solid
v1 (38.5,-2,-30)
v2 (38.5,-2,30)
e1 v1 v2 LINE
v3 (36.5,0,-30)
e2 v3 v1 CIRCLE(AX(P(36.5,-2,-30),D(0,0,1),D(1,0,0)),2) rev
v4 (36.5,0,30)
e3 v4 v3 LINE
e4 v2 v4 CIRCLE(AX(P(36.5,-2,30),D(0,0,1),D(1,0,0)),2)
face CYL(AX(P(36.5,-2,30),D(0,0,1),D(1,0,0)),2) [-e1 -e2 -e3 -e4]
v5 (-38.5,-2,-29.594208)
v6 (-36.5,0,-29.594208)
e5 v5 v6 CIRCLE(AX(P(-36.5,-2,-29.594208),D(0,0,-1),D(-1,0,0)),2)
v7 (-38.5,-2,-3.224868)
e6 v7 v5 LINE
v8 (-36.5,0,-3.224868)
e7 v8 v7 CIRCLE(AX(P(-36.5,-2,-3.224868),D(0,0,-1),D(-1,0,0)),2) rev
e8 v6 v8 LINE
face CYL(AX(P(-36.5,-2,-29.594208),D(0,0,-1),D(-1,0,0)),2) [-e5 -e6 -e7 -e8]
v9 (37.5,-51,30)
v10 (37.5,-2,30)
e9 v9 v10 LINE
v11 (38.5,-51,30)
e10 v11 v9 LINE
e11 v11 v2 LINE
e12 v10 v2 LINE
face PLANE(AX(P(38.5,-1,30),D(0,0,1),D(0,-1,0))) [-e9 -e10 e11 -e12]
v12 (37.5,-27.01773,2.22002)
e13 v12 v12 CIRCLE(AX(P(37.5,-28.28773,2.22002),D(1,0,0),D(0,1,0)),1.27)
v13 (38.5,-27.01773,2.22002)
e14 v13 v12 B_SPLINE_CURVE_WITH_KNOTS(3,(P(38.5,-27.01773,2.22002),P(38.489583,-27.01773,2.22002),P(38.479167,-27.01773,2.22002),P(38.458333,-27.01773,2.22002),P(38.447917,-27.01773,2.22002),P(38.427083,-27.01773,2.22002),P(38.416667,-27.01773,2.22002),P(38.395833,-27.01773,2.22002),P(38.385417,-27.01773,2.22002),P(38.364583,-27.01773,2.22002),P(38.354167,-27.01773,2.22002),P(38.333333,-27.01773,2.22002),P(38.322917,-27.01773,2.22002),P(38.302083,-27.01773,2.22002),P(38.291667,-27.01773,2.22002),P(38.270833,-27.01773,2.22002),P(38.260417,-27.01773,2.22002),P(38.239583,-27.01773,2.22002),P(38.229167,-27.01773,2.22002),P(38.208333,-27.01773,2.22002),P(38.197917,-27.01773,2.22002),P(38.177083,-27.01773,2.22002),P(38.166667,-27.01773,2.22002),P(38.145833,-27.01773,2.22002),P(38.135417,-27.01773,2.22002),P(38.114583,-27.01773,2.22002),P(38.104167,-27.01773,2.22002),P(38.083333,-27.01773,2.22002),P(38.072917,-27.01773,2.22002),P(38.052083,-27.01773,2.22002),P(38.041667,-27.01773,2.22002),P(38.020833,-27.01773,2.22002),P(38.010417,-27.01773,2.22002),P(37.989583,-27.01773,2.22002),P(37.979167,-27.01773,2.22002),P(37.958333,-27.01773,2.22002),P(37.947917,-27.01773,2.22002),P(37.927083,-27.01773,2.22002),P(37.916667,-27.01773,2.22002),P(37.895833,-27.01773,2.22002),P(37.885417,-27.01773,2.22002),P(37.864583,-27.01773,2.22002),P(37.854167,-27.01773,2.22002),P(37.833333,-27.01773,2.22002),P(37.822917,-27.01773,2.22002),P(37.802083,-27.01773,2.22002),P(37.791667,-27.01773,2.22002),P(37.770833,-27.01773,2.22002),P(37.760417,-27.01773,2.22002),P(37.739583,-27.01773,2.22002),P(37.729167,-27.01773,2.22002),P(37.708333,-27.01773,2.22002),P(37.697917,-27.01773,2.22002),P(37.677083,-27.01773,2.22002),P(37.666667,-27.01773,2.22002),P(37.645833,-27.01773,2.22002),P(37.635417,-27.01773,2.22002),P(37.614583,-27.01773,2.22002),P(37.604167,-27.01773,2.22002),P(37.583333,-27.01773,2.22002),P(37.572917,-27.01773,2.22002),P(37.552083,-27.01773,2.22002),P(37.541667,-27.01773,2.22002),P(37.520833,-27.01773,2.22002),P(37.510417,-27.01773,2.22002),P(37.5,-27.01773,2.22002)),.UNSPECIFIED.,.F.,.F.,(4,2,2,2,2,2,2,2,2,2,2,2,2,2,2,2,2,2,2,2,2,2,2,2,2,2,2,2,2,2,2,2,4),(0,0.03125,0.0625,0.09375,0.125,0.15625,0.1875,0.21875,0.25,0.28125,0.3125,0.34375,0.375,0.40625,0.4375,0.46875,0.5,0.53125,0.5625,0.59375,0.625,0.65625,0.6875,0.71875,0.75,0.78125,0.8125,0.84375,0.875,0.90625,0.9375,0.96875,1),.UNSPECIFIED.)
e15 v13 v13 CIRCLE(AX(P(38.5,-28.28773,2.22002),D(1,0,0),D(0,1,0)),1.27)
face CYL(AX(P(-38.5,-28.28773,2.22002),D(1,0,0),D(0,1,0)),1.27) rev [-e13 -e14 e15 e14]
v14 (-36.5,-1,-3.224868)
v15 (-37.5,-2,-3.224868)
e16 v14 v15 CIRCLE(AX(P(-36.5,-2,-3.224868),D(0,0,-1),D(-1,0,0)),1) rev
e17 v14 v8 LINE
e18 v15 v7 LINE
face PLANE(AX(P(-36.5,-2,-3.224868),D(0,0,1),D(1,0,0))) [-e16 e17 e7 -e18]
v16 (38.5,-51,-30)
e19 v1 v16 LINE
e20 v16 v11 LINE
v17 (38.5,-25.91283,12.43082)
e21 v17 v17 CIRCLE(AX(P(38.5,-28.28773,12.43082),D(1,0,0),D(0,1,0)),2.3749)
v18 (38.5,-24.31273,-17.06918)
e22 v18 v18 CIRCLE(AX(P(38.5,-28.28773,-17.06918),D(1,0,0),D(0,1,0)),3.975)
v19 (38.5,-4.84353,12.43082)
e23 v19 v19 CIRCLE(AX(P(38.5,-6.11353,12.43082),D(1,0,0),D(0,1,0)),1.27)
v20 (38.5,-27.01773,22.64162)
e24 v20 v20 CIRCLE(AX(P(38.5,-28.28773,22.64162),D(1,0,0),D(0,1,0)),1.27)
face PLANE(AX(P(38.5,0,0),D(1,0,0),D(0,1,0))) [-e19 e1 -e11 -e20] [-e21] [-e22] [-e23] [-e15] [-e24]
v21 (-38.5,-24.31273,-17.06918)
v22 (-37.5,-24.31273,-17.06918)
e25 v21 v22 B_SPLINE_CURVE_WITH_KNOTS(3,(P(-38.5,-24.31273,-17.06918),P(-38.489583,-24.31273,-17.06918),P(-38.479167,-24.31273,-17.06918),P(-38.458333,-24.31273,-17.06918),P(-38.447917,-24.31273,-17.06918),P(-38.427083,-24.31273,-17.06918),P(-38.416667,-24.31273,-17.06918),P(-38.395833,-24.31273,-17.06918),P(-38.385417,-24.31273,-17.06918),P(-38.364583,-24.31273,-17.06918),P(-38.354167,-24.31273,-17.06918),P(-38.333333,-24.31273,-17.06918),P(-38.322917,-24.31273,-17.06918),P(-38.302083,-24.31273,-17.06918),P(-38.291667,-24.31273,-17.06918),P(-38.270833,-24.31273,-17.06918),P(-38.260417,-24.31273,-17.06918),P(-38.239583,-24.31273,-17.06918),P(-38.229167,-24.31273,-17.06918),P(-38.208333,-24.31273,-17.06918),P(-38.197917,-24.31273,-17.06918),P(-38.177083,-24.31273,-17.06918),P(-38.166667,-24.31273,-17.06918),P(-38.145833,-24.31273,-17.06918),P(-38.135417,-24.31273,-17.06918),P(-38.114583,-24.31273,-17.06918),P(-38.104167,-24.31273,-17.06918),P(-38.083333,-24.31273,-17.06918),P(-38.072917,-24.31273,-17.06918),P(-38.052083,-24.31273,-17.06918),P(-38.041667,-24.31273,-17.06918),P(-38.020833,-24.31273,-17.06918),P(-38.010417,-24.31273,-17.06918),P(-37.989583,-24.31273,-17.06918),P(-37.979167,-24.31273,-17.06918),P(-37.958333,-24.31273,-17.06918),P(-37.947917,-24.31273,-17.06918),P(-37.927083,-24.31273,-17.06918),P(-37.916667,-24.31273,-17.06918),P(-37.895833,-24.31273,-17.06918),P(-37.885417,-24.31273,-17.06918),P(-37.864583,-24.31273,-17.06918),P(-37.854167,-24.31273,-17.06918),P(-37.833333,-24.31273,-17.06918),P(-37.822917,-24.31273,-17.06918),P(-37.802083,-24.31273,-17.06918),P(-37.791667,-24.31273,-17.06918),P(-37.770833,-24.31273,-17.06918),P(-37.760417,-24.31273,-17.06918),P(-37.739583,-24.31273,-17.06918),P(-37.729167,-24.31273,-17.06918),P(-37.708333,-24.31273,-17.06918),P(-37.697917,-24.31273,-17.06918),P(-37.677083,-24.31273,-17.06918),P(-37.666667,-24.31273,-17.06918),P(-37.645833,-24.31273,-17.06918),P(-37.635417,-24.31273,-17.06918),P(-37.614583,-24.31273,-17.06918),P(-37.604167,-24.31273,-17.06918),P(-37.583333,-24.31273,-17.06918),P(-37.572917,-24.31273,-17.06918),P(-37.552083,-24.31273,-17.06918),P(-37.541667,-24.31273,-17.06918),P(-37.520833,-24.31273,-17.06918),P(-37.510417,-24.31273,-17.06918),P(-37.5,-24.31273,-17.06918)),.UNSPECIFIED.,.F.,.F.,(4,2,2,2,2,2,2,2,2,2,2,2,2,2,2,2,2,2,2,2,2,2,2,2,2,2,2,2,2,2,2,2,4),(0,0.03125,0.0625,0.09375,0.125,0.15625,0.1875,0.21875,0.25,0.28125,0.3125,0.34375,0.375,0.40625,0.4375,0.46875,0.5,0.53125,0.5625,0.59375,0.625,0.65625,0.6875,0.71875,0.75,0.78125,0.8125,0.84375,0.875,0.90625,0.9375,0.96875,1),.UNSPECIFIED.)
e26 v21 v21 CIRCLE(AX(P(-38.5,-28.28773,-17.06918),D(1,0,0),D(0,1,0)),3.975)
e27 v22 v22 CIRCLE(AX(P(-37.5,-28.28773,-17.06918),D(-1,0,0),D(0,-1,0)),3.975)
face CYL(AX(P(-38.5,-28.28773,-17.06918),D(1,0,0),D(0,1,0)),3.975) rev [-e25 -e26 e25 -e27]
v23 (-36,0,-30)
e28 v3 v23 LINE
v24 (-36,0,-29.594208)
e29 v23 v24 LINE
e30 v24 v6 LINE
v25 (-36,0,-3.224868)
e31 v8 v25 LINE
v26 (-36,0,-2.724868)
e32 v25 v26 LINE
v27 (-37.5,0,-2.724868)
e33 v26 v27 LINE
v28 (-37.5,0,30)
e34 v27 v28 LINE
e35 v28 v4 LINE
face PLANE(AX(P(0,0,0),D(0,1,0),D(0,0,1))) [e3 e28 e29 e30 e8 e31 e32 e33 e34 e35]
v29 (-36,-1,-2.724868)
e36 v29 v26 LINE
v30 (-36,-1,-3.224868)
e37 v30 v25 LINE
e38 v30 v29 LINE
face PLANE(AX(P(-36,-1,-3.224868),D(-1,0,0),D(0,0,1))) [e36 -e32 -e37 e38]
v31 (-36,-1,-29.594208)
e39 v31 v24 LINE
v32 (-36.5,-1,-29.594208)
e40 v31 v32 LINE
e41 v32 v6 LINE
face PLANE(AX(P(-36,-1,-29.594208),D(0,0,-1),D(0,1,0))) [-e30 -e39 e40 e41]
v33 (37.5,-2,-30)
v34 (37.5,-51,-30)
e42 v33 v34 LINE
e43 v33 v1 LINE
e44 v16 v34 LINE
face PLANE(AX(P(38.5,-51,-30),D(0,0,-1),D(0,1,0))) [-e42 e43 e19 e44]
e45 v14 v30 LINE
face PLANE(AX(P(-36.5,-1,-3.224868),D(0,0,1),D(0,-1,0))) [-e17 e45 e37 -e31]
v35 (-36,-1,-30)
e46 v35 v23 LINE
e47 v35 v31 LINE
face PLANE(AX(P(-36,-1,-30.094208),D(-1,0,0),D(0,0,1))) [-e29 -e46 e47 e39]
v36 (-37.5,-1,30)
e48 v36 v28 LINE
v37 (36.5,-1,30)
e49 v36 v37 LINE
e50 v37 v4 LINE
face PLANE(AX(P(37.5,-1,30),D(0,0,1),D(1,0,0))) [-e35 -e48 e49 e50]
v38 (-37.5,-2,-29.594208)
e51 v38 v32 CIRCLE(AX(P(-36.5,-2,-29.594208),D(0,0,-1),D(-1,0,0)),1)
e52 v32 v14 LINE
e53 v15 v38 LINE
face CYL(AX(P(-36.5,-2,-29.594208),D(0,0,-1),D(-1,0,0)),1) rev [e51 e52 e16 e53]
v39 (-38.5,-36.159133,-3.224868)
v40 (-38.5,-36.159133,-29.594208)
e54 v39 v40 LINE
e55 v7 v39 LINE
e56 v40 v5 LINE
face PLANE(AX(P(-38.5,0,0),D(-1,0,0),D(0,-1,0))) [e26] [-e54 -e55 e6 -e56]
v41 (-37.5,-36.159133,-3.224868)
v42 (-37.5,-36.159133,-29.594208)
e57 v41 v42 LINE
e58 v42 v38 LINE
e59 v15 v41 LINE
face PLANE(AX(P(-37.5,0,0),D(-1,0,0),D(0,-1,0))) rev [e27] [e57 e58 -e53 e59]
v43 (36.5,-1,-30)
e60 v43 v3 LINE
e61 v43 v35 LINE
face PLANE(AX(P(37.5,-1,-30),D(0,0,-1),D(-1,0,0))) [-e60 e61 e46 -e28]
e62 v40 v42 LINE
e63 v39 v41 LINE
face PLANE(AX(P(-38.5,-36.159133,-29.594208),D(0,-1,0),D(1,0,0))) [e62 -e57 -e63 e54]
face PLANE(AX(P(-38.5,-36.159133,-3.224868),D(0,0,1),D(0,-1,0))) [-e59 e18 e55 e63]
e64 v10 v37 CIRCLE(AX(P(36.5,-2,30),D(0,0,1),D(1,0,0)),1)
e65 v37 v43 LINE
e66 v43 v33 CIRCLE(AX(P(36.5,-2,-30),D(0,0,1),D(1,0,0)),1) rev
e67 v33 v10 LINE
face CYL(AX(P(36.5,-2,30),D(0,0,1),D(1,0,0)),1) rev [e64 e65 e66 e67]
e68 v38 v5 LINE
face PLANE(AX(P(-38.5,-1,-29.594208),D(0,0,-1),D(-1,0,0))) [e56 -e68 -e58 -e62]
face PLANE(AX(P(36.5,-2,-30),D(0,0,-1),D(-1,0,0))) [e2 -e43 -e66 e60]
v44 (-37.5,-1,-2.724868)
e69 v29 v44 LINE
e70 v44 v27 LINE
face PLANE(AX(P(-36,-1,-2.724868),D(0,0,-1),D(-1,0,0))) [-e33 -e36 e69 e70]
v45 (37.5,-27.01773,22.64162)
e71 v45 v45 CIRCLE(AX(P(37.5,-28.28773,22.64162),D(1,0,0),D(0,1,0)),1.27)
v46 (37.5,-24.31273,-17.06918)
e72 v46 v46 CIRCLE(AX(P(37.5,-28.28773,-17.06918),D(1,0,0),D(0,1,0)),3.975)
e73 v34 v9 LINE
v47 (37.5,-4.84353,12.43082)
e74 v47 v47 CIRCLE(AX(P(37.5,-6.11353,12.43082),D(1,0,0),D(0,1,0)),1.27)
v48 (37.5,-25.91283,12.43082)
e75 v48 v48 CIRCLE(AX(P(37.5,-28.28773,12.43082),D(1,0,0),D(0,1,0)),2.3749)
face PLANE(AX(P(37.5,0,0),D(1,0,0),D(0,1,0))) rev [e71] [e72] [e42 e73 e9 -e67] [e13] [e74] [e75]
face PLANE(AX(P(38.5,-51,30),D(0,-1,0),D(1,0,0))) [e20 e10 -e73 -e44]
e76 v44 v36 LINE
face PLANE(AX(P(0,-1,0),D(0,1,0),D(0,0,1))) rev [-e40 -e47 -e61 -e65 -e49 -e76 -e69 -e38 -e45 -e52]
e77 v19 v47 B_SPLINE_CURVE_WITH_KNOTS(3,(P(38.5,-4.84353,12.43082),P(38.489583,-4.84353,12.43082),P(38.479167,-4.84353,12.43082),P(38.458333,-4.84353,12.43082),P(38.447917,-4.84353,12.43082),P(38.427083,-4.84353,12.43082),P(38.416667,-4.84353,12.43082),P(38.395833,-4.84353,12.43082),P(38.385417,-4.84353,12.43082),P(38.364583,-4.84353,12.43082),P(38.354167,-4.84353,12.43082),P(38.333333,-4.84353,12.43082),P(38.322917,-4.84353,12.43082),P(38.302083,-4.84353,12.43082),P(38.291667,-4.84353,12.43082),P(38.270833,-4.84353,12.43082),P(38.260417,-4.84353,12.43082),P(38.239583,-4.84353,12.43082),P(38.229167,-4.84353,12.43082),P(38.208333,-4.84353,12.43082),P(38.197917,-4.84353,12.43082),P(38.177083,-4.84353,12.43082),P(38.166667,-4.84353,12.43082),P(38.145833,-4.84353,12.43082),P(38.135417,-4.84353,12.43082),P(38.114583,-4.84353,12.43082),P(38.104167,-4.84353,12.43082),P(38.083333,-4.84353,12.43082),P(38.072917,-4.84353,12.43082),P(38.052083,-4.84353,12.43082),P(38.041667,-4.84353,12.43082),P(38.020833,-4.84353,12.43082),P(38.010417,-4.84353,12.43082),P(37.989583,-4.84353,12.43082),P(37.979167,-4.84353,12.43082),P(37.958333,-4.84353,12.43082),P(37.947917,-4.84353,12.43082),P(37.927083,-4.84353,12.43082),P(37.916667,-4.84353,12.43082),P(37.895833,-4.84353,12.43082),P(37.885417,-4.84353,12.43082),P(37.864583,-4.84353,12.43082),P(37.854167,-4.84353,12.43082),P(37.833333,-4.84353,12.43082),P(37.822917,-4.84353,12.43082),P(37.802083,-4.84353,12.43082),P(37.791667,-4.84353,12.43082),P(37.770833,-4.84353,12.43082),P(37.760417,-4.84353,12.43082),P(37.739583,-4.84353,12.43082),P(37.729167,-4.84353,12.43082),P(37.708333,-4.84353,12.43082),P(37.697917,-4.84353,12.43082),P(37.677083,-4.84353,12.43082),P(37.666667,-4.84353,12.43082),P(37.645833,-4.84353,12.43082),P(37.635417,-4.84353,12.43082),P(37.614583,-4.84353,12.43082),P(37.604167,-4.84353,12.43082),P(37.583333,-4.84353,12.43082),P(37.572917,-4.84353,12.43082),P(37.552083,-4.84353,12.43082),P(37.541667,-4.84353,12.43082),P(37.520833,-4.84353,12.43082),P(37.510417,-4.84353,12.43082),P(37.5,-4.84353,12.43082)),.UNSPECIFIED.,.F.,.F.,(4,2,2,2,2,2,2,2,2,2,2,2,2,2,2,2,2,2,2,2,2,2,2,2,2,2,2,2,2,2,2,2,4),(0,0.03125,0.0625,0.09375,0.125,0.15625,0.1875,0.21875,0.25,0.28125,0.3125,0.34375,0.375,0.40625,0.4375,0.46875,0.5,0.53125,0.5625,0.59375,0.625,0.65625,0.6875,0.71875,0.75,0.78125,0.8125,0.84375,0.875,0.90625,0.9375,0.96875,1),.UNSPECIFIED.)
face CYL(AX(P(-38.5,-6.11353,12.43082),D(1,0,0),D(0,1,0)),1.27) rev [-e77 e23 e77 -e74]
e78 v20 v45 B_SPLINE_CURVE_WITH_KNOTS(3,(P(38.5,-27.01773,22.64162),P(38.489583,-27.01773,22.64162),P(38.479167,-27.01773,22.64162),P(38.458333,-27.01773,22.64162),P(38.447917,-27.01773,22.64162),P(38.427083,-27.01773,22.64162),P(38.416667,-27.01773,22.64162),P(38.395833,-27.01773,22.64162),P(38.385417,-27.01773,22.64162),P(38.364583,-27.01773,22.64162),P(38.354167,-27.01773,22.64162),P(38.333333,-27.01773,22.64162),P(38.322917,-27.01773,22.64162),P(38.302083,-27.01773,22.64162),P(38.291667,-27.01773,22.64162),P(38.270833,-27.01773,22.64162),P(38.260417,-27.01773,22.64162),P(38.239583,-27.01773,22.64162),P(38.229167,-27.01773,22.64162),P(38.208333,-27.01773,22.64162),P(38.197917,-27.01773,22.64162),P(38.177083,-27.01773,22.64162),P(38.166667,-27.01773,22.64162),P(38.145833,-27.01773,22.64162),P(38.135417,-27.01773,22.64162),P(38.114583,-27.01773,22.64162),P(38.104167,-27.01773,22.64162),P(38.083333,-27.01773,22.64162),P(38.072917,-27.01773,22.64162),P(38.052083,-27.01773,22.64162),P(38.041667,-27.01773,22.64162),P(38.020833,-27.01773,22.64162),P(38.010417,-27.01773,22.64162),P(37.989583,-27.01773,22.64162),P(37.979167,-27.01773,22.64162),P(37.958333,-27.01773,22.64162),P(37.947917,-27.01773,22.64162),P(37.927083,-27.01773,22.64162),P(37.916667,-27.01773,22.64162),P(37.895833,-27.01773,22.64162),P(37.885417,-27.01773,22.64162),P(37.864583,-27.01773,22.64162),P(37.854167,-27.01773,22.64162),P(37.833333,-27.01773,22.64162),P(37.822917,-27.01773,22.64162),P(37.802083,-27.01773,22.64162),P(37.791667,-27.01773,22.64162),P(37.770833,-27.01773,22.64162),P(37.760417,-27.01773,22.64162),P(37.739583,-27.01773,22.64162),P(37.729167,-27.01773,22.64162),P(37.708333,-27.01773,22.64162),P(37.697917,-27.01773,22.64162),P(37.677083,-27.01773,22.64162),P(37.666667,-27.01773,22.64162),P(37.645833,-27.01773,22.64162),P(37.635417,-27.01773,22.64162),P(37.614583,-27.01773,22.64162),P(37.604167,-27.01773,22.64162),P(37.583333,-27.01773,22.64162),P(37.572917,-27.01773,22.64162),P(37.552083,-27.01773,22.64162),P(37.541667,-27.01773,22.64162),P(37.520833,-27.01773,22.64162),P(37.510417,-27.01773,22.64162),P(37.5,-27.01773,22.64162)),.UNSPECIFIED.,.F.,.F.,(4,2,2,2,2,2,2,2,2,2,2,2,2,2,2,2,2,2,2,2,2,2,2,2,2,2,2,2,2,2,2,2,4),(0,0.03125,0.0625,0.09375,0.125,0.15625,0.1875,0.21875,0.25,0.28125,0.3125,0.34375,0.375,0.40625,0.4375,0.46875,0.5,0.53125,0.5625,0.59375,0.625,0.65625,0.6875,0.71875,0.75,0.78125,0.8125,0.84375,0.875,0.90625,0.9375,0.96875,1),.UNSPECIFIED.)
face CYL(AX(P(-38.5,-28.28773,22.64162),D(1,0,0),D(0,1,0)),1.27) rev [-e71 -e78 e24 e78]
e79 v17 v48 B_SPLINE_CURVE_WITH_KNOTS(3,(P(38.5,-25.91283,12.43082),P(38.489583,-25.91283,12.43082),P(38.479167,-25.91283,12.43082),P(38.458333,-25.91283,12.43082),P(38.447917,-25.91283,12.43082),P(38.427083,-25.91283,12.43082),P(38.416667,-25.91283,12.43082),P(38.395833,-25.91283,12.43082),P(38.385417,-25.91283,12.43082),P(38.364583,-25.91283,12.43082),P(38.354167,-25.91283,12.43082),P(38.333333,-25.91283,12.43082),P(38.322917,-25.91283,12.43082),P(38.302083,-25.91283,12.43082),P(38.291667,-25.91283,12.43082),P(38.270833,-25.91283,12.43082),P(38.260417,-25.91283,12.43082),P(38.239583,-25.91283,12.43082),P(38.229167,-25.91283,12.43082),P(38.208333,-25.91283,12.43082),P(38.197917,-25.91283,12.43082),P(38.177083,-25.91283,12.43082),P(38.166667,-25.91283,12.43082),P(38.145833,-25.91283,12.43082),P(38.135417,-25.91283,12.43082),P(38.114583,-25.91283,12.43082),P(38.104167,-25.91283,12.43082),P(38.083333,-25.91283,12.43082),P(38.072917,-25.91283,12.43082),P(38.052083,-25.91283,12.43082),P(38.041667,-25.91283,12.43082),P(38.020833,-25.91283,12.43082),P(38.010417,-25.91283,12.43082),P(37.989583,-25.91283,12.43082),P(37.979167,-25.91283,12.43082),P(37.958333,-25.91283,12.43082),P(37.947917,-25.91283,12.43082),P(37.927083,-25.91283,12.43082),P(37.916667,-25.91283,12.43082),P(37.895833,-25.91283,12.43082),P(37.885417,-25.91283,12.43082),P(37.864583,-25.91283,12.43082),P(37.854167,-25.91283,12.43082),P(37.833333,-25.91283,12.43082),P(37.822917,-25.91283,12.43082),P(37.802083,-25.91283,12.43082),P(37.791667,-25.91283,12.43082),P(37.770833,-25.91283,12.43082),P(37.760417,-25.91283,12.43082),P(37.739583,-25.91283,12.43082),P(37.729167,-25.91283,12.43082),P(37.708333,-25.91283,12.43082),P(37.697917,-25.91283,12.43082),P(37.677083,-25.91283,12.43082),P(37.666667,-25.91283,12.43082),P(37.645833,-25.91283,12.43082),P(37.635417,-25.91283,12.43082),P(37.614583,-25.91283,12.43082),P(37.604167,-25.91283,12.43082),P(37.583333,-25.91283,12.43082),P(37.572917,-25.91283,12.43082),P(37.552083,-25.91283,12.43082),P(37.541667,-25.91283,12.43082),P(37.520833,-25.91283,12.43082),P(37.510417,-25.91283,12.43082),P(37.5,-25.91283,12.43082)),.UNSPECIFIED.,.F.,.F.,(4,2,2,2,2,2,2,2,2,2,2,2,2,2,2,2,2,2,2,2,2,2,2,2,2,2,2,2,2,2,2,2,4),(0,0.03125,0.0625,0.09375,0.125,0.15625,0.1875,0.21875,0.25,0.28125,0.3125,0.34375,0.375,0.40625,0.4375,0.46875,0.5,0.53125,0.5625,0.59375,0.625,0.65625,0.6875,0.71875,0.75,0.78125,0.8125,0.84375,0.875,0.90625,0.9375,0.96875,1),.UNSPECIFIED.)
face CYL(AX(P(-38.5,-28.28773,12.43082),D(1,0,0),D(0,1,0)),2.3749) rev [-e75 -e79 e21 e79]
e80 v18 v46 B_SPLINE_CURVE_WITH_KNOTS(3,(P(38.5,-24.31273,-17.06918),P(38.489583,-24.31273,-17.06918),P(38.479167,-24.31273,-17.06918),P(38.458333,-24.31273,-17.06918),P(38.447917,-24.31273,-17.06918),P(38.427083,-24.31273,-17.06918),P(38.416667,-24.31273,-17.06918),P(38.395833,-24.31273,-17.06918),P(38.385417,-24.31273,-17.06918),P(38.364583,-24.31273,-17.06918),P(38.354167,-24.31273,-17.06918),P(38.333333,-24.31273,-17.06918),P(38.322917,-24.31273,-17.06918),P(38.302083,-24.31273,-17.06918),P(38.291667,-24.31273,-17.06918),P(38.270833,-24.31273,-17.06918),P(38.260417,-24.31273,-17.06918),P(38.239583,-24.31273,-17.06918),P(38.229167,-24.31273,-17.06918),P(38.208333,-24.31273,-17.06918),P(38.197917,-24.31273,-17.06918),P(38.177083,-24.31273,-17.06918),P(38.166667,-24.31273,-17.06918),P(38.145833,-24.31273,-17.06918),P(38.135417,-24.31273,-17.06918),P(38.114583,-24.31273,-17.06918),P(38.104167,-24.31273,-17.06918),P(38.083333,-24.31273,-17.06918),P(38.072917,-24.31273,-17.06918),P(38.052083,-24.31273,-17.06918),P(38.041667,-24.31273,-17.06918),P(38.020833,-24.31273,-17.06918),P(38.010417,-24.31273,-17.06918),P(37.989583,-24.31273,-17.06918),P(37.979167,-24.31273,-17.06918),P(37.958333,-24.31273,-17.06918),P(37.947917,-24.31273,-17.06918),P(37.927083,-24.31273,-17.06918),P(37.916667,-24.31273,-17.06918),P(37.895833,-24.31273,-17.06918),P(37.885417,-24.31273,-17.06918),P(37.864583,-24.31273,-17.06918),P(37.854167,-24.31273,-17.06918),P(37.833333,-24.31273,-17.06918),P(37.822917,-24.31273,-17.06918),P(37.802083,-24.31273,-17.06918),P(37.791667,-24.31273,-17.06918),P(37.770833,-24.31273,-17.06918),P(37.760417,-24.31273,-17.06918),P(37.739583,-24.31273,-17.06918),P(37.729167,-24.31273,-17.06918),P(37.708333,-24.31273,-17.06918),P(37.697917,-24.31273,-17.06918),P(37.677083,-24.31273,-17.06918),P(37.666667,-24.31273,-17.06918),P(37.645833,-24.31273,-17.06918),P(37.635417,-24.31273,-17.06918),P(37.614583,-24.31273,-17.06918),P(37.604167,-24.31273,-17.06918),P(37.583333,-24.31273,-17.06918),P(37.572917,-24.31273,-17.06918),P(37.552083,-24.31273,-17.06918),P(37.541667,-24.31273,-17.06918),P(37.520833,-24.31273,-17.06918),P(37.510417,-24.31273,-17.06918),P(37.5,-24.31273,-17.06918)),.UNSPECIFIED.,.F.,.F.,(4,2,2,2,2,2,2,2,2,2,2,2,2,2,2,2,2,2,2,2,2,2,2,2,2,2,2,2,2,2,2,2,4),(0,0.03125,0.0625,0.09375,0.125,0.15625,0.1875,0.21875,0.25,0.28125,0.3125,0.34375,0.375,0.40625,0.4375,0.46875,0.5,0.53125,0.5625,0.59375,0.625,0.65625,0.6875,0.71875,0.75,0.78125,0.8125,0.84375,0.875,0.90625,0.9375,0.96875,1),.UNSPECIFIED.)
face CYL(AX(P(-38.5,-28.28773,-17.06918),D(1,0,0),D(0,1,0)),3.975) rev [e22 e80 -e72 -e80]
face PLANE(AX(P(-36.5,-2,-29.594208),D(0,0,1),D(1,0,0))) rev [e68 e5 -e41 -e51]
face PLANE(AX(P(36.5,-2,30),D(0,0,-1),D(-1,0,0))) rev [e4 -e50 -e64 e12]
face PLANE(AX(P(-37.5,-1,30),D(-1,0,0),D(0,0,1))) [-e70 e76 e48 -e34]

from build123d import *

# Parameters (mm, degrees)
SKETCH1_W                     = 75
SKETCH1_H                     = 60
BASE_FLANGE1_DEPTH            = 1
EDGE_FLANGE1_STRIP_W          = 6
EDGE_FLANGE1_STRIP_H          = 1
EDGE_FLANGE1_STRIP_CUT_DEPTH  = 60
EDGE_FLANGE1_DEPTH            = 60
EDGE_FLANGE3_STRIP_W          = 6
EDGE_FLANGE3_STRIP_H          = 1
EDGE_FLANGE3_STRIP_CUT_DEPTH  = 26.369340124
EDGE_FLANGE3_RELIEF_W         = 6.5
EDGE_FLANGE3_RELIEF_H         = 0.5
EDGE_FLANGE3_RELIEF_CUT_DEPTH = 1
EDGE_FLANGE3_DEPTH            = 26.369340124
SKETCH15_R                    = 1.27
SKETCH15_R_2                  = 2.3749
SKETCH15_R_3                  = 3.975
CUT_EXTRUDE4_DEPTH            = 98.10818709


# Sheet-metal steps are written as plain solids
with BuildPart() as part:
    # Sketch1 → Base-Flange1 (new body)
    with BuildSketch(Plane(origin=(0, 0, 0), x_dir=(1, 0, 0), z_dir=(0, 1, 0))):
        Rectangle(SKETCH1_W, SKETCH1_H)
    extrude(amount=-BASE_FLANGE1_DEPTH)

    # Edge-Flange1 strip (across the edge) → Edge-Flange1 strip cut (cut)
    with BuildSketch(Plane(origin=(37.5, -1, -30), x_dir=(-1, 0, 0), z_dir=(0, 0, 1))):
        with Locations((-2, -0.5)):
            Rectangle(EDGE_FLANGE1_STRIP_W, EDGE_FLANGE1_STRIP_H)
    extrude(amount=EDGE_FLANGE1_STRIP_CUT_DEPTH, mode=Mode.SUBTRACT)

    # Edge-Flange1 section (across the edge) → Edge-Flange1 (add)
    with BuildSketch(Plane(origin=(37.5, -1, -30), x_dir=(-1, 0, 0), z_dir=(0, 0, 1))):
        with BuildLine():
            Line((-1, 1), (-1, 50))
            Line((-1, 50), (0, 50))
            Line((0, 50), (0, 1))
            ThreePointArc((0, 1), (0.292893219, 0.292893219), (1, 0))
            Line((1, 0), (1, -1))
            ThreePointArc((1, -1), (-0.414213562, -0.414213562), (-1, 1))
        make_face()
    extrude(amount=EDGE_FLANGE1_DEPTH)

    # Edge-Flange3 strip (across the edge) → Edge-Flange3 strip cut (cut)
    with BuildSketch(Plane(origin=(-37.5, -1, -3.224868286), x_dir=(1, 0, 0), z_dir=(0, 0, -1))):
        with Locations((-2, -0.5)):
            Rectangle(EDGE_FLANGE3_STRIP_W, EDGE_FLANGE3_STRIP_H)
    extrude(amount=EDGE_FLANGE3_STRIP_CUT_DEPTH, mode=Mode.SUBTRACT)

    # Edge-Flange3 relief (on the sheet) → Edge-Flange3 relief cut (cut)
    with BuildSketch(Plane(origin=(-36.5, -1, -3.224868286), x_dir=(1, 0, 0), z_dir=(0, -1, 0))):
        with Locations((-2.75, 0.25)):
            Rectangle(EDGE_FLANGE3_RELIEF_W, EDGE_FLANGE3_RELIEF_H)
        with Locations((-2.75, -26.619340124)):
            Rectangle(EDGE_FLANGE3_RELIEF_W, EDGE_FLANGE3_RELIEF_H)
    extrude(amount=-EDGE_FLANGE3_RELIEF_CUT_DEPTH, mode=Mode.SUBTRACT)

    # Edge-Flange3 section (across the edge) → Edge-Flange3 (add)
    with BuildSketch(Plane(origin=(-37.5, -1, -3.224868286), x_dir=(1, 0, 0), z_dir=(0, 0, -1))):
        with BuildLine():
            Line((-1, 1), (-1, 35.1591326))
            Line((-1, 35.1591326), (0, 35.1591326))
            Line((0, 35.1591326), (0, 1))
            ThreePointArc((0, 1), (0.292893219, 0.292893219), (1, 0))
            Line((1, 0), (1, -1))
            ThreePointArc((1, -1), (-0.414213562, -0.414213562), (-1, 1))
        make_face()
    extrude(amount=EDGE_FLANGE3_DEPTH)

    # Sketch15 → Cut-Extrude4 (cut, through all)
    with BuildSketch(Plane(origin=(38.5, 0, 0), x_dir=(0, 0, -1), z_dir=(1, 0, 0))):
        with Locations(Location((-22.64162, -28.28773, 0), (0, 0, 90))):
            Circle(SKETCH15_R)
        with Locations(Location((-12.43082, -28.28773, 0), (0, 0, 90))):
            Circle(SKETCH15_R_2)
        with Locations(Location((-2.22002, -28.28773, 0), (0, 0, 90))):
            Circle(SKETCH15_R)
        with Locations(Location((-12.43082, -6.11353, 0), (0, 0, 90))):
            Circle(SKETCH15_R)
        with Locations(Location((17.06918, -28.28773, 0), (0, 0, 90))):
            Circle(SKETCH15_R_3)
    extrude(amount=-CUT_EXTRUDE4_DEPTH, mode=Mode.SUBTRACT)


solid = part.part
